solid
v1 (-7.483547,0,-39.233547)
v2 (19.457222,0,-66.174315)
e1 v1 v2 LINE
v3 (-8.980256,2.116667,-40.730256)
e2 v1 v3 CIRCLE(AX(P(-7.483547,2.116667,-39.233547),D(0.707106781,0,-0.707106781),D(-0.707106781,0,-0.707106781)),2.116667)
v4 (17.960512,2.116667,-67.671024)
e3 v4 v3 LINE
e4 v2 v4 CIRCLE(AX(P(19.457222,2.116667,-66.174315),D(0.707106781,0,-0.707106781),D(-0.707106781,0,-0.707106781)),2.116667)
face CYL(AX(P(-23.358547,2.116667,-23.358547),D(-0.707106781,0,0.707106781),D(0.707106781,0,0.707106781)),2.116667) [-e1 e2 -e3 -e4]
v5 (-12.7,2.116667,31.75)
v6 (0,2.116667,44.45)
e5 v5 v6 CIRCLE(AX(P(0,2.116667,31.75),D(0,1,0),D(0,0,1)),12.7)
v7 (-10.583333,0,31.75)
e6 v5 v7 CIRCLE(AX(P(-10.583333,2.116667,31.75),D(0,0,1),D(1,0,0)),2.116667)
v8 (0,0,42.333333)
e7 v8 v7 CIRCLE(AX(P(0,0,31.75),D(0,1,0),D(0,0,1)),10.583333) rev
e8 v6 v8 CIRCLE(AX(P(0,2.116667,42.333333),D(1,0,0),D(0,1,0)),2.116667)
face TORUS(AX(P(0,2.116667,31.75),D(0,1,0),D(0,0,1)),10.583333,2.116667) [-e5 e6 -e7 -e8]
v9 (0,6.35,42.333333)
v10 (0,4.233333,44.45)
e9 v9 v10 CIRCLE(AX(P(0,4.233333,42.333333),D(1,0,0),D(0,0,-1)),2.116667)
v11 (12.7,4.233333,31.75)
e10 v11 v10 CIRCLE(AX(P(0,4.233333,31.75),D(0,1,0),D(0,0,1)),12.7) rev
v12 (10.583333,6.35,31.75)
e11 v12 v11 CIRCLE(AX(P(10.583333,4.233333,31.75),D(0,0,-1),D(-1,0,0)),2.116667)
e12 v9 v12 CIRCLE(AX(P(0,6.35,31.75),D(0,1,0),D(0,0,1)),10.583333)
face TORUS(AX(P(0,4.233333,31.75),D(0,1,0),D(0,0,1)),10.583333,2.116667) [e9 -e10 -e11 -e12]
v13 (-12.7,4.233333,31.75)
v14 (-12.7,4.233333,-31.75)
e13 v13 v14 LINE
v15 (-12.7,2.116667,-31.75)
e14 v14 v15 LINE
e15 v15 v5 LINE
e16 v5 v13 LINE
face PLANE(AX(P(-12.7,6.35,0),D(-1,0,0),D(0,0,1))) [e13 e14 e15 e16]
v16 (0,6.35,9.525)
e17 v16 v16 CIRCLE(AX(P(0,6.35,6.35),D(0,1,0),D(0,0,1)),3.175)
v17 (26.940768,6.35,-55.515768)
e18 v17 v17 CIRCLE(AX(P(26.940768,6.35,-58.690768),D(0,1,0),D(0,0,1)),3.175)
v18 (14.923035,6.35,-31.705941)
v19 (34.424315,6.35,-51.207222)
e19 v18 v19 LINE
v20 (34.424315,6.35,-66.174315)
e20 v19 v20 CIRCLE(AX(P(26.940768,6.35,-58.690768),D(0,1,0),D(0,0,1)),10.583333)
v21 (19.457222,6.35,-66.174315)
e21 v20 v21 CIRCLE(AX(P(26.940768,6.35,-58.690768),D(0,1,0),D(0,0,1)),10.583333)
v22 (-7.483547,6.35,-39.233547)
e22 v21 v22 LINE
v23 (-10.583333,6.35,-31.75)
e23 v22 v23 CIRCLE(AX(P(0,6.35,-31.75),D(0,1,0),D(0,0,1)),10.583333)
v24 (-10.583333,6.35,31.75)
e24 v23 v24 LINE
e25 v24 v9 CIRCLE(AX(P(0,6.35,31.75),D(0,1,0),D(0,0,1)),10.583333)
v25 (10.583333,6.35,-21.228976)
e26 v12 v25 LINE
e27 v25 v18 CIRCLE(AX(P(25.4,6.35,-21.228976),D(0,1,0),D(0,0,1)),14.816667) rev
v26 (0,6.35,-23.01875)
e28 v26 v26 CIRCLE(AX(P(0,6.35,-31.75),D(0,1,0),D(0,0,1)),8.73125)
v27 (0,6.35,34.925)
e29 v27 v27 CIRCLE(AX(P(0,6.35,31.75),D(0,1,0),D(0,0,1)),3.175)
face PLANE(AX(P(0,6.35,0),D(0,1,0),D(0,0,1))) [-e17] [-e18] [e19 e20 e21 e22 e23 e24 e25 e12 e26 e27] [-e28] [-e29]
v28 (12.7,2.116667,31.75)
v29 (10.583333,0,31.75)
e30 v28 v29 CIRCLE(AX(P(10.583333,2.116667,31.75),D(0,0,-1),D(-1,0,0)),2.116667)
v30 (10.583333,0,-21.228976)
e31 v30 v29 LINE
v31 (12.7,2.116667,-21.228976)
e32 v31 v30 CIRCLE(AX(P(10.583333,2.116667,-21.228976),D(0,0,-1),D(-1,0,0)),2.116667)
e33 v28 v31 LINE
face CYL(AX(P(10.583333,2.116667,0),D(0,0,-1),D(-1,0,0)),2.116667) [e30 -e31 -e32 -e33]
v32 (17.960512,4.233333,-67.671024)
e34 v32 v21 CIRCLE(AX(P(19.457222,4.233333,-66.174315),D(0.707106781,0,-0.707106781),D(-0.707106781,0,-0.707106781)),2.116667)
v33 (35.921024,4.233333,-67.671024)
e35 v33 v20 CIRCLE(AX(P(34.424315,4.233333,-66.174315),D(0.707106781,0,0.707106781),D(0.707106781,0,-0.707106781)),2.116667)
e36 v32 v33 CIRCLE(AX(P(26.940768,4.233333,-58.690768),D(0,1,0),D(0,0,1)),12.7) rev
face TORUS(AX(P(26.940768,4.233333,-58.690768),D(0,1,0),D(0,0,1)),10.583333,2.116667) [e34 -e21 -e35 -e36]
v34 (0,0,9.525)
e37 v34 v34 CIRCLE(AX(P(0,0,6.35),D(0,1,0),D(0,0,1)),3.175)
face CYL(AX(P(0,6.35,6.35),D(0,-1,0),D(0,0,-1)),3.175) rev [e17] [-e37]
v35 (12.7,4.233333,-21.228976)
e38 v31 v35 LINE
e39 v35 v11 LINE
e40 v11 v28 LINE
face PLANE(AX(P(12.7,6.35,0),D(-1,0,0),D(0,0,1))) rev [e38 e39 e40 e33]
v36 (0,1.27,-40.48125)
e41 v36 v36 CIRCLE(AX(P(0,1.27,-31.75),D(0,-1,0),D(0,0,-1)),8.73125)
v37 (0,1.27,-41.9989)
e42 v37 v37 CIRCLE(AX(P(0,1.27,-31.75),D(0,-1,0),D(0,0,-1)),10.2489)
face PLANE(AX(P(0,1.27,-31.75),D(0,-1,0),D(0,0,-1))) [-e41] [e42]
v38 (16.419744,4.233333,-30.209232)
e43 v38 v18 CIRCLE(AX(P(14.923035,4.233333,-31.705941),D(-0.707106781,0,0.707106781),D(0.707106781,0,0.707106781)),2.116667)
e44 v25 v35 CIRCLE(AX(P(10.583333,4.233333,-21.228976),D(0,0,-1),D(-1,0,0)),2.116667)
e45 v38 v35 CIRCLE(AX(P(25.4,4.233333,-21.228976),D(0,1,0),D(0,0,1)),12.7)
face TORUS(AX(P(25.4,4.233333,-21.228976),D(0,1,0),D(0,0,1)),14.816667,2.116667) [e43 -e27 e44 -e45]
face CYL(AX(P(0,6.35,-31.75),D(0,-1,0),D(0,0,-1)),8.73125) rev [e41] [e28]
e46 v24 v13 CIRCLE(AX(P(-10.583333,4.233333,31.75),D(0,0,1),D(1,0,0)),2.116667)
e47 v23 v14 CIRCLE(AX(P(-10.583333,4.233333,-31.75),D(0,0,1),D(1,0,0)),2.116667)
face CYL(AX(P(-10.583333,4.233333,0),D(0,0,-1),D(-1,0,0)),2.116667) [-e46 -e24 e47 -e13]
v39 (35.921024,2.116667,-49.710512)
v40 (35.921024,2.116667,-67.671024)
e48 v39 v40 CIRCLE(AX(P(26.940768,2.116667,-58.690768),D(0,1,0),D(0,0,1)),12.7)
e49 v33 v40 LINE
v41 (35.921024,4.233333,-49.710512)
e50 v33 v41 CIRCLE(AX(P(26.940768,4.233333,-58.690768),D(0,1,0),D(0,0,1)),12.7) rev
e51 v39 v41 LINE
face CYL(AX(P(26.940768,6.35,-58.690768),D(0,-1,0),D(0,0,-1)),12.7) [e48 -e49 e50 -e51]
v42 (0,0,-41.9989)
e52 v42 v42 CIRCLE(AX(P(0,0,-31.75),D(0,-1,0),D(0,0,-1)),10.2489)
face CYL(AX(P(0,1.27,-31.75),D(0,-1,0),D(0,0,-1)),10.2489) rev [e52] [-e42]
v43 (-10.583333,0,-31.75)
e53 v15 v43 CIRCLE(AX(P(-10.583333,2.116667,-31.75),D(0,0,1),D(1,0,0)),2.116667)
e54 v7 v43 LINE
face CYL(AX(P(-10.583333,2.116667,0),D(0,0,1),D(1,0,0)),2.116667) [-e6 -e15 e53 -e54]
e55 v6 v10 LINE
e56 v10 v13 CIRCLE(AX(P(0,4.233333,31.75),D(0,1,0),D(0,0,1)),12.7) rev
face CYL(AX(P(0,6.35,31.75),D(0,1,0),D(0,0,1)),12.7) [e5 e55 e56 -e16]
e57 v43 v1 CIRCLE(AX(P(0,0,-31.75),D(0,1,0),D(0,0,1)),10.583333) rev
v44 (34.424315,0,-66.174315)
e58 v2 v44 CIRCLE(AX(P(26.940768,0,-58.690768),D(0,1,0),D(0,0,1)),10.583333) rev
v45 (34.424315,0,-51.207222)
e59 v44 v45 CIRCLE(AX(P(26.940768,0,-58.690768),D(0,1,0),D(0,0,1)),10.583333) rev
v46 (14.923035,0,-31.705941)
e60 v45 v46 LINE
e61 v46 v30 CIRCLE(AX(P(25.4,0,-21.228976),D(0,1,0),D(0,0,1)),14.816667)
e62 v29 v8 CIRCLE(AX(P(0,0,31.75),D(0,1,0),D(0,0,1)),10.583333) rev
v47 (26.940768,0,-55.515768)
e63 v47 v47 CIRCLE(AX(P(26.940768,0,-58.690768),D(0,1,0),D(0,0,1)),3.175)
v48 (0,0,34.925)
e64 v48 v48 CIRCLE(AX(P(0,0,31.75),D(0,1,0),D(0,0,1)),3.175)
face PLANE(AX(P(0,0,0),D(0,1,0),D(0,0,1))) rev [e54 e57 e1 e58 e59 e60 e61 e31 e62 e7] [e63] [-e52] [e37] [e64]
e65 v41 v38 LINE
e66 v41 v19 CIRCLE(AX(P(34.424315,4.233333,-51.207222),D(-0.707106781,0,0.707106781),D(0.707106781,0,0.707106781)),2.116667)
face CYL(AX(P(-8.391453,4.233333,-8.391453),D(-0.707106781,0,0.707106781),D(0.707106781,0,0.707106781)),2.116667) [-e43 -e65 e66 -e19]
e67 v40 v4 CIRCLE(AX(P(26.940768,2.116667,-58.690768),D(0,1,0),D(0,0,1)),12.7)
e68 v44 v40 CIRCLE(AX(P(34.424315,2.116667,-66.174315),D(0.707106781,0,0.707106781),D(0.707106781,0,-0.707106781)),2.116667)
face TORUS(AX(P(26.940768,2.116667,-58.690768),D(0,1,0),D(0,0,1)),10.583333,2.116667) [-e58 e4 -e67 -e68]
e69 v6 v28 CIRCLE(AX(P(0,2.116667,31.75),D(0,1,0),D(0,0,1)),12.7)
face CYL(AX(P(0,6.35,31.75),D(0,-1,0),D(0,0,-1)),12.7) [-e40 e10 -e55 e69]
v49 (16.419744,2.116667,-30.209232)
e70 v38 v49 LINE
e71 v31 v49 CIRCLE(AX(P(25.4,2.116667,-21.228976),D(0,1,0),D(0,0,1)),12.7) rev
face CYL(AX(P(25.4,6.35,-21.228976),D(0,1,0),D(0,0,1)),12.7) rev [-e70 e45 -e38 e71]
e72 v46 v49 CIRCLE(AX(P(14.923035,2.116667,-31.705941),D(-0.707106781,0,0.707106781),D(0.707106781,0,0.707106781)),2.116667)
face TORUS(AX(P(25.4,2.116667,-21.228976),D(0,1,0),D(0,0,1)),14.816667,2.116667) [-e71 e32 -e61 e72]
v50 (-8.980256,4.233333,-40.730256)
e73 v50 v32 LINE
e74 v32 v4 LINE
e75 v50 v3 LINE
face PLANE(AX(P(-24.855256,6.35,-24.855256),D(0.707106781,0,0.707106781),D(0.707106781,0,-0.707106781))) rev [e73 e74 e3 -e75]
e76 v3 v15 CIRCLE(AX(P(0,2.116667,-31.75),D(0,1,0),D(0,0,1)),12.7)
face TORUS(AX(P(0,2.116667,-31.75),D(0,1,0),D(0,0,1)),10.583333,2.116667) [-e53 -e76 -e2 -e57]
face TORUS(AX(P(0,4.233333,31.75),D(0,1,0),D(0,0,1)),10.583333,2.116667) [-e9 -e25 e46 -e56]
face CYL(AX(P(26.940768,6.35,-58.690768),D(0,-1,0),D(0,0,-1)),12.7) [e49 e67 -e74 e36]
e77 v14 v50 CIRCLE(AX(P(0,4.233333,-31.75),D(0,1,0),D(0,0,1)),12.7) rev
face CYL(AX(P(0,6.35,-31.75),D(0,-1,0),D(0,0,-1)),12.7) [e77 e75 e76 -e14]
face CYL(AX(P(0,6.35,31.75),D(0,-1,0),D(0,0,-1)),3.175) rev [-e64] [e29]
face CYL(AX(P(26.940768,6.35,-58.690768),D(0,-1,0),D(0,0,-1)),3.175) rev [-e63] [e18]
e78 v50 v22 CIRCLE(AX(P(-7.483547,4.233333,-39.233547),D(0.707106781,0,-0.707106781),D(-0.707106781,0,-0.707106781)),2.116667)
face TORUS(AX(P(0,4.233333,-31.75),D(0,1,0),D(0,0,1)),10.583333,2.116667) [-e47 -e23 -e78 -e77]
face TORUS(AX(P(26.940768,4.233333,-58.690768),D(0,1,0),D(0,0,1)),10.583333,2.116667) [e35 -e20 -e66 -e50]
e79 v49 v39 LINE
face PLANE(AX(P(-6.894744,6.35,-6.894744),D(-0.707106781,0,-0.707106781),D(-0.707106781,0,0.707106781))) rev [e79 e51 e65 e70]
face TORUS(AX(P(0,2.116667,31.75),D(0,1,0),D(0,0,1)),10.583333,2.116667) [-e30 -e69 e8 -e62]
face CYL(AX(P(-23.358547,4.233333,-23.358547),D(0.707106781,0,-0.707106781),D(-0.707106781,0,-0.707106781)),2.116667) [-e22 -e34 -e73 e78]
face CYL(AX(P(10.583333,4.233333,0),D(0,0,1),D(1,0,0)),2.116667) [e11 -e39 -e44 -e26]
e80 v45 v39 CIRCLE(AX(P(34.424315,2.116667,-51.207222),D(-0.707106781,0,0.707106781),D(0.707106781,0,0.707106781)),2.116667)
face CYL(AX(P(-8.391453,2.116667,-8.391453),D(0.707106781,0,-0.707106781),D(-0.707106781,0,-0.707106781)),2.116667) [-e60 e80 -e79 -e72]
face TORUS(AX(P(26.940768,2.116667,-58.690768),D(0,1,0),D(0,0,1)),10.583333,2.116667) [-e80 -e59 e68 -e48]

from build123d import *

# Parameters (mm, degrees)
SKETCH1_R           = 3.175
SKETCH1_R_2         = 12.7
SKETCH1_R_3         = 8.73125
BOSS_EXTRUDE1_DEPTH = 6.35
FILLET2_R           = 12.7
FILLET3_R           = 2.116666667
SKETCH3_R           = 10.2489
CUT_EXTRUDE1_DEPTH  = 1.27


with BuildPart() as part:
    # Sketch1 → Boss-Extrude1 (new body)
    # profile 1 of 4: a face of its own
    with BuildSketch(Plane(origin=(0, 0, 0), x_dir=(1, 0, 0), z_dir=(0, 1, 0))):
        with BuildLine():
            Line((-12.7, 31.75), (-12.7, -44.45))
            Line((-12.7, -44.45), (12.7, -44.45))
            Line((12.7, -44.45), (12.7, 26.489487758))
            Line((12.7, 26.489487758), (8.980256121, 22.769743879))
            ThreePointArc((8.980256121, 22.769743879), (-4.860079591, 20.016729937), (-12.7, 31.75))
        make_face()
        with Locations(Location((0, -31.75, 0), (0, 0, 270))):
            Circle(SKETCH1_R, mode=Mode.SUBTRACT)
        with Locations(Location((0, -6.35, 0), (0, 0, 270))):
            Circle(SKETCH1_R, mode=Mode.SUBTRACT)
    # profile 2 of 4: a face of its own
    with BuildSketch(Plane(origin=(0, 0, 0), x_dir=(1, 0, 0), z_dir=(0, 1, 0))):
        with Locations((0, 31.75)):
            Circle(SKETCH1_R_2)
        with Locations(Location((0, 31.75, 0), (0, 0, 270))):
            Circle(SKETCH1_R_3, mode=Mode.SUBTRACT)
    # profile 3 of 4: a face of its own
    with BuildSketch(Plane(origin=(0, 0, 0), x_dir=(1, 0, 0), z_dir=(0, 1, 0))):
        with BuildLine():
            Line((12.7, 31.75), (12.7, 26.489487758))
            Line((12.7, 26.489487758), (44.901280605, 58.690768363))
            Line((44.901280605, 58.690768363), (26.940768363, 76.651280605))
            Line((26.940768363, 76.651280605), (-8.980256121, 40.730256121))
            ThreePointArc((-8.980256121, 40.730256121), (4.860079591, 43.483270063), (12.7, 31.75))
        make_face()
        with Locations(Location((26.940768363, 58.690768363, 0), (0, 0, 270))):
            Circle(SKETCH1_R, mode=Mode.SUBTRACT)
    # profile 4 of 4: a face of its own
    with BuildSketch(Plane(origin=(0, 0, 0), x_dir=(1, 0, 0), z_dir=(0, 1, 0))):
        with BuildLine():
            Line((8.980256121, 22.769743879), (12.7, 26.489487758))
            Line((12.7, 26.489487758), (12.7, 31.75))
            ThreePointArc((12.7, 31.75), (11.733270063, 26.889920409), (8.980256121, 22.769743879))
        make_face()
    extrude(amount=BOSS_EXTRUDE1_DEPTH)

    # Fillet2
    fillet2_edges = [part.edges().sort_by_distance(p)[0] for p in [
        (12.7, 3.175, -26.489487758),
        (26.940768363, 3.175, -76.651280605),
        (44.901280605, 3.175, -58.690768363),
        (-12.7, 3.175, 44.45),
        (12.7, 3.175, 44.45),
    ]]
    fillet(fillet2_edges, radius=FILLET2_R - 0.0001)  # a hair under: the kernel refuses the full size

    # Fillet3
    fillet3_edges = [part.edges().sort_by_distance(p)[0] for p in [
        (-11.733270063, 6.35, -36.610079591),
        (-11.733270063, 0, -36.610079591),
        (26.170404892, 0, -39.95989265),
        (26.170404892, 6.35, -39.95989265),
        (12.7, 0, 5.260541531),
        (12.7, 6.35, 5.260541531),
        (4.490163416, 0, -54.200675658),
        (4.490163416, 6.35, -54.200675658),
        (-12.7, 0, 5e-05),
        (8.98028541, 0, 40.73028541),
        (-8.98028541, 0, 40.73028541),
        (39.640809785, 0, -58.690768363),
        (26.940768363, 0, -71.390809785),
        (-12.7, 6.35, 5e-05),
        (8.98028541, 6.35, 40.73028541),
        (-8.98028541, 6.35, 40.73028541),
        (39.640809785, 6.35, -58.690768363),
        (26.940768363, 6.35, -71.390809785),
        (13.666722325, 0, -26.08905826),
        (13.666722325, 6.35, -26.08905826),
    ]]
    fillet(fillet3_edges, radius=FILLET3_R)

    # Sketch3 → Cut-Extrude1 (cut)
    with BuildSketch(Plane.XZ):
        with Locations(Location((0, -31.75, 0), (0, 0, 270))):
            Circle(SKETCH3_R)
    extrude(amount=-CUT_EXTRUDE1_DEPTH, mode=Mode.SUBTRACT)


solid = part.part
